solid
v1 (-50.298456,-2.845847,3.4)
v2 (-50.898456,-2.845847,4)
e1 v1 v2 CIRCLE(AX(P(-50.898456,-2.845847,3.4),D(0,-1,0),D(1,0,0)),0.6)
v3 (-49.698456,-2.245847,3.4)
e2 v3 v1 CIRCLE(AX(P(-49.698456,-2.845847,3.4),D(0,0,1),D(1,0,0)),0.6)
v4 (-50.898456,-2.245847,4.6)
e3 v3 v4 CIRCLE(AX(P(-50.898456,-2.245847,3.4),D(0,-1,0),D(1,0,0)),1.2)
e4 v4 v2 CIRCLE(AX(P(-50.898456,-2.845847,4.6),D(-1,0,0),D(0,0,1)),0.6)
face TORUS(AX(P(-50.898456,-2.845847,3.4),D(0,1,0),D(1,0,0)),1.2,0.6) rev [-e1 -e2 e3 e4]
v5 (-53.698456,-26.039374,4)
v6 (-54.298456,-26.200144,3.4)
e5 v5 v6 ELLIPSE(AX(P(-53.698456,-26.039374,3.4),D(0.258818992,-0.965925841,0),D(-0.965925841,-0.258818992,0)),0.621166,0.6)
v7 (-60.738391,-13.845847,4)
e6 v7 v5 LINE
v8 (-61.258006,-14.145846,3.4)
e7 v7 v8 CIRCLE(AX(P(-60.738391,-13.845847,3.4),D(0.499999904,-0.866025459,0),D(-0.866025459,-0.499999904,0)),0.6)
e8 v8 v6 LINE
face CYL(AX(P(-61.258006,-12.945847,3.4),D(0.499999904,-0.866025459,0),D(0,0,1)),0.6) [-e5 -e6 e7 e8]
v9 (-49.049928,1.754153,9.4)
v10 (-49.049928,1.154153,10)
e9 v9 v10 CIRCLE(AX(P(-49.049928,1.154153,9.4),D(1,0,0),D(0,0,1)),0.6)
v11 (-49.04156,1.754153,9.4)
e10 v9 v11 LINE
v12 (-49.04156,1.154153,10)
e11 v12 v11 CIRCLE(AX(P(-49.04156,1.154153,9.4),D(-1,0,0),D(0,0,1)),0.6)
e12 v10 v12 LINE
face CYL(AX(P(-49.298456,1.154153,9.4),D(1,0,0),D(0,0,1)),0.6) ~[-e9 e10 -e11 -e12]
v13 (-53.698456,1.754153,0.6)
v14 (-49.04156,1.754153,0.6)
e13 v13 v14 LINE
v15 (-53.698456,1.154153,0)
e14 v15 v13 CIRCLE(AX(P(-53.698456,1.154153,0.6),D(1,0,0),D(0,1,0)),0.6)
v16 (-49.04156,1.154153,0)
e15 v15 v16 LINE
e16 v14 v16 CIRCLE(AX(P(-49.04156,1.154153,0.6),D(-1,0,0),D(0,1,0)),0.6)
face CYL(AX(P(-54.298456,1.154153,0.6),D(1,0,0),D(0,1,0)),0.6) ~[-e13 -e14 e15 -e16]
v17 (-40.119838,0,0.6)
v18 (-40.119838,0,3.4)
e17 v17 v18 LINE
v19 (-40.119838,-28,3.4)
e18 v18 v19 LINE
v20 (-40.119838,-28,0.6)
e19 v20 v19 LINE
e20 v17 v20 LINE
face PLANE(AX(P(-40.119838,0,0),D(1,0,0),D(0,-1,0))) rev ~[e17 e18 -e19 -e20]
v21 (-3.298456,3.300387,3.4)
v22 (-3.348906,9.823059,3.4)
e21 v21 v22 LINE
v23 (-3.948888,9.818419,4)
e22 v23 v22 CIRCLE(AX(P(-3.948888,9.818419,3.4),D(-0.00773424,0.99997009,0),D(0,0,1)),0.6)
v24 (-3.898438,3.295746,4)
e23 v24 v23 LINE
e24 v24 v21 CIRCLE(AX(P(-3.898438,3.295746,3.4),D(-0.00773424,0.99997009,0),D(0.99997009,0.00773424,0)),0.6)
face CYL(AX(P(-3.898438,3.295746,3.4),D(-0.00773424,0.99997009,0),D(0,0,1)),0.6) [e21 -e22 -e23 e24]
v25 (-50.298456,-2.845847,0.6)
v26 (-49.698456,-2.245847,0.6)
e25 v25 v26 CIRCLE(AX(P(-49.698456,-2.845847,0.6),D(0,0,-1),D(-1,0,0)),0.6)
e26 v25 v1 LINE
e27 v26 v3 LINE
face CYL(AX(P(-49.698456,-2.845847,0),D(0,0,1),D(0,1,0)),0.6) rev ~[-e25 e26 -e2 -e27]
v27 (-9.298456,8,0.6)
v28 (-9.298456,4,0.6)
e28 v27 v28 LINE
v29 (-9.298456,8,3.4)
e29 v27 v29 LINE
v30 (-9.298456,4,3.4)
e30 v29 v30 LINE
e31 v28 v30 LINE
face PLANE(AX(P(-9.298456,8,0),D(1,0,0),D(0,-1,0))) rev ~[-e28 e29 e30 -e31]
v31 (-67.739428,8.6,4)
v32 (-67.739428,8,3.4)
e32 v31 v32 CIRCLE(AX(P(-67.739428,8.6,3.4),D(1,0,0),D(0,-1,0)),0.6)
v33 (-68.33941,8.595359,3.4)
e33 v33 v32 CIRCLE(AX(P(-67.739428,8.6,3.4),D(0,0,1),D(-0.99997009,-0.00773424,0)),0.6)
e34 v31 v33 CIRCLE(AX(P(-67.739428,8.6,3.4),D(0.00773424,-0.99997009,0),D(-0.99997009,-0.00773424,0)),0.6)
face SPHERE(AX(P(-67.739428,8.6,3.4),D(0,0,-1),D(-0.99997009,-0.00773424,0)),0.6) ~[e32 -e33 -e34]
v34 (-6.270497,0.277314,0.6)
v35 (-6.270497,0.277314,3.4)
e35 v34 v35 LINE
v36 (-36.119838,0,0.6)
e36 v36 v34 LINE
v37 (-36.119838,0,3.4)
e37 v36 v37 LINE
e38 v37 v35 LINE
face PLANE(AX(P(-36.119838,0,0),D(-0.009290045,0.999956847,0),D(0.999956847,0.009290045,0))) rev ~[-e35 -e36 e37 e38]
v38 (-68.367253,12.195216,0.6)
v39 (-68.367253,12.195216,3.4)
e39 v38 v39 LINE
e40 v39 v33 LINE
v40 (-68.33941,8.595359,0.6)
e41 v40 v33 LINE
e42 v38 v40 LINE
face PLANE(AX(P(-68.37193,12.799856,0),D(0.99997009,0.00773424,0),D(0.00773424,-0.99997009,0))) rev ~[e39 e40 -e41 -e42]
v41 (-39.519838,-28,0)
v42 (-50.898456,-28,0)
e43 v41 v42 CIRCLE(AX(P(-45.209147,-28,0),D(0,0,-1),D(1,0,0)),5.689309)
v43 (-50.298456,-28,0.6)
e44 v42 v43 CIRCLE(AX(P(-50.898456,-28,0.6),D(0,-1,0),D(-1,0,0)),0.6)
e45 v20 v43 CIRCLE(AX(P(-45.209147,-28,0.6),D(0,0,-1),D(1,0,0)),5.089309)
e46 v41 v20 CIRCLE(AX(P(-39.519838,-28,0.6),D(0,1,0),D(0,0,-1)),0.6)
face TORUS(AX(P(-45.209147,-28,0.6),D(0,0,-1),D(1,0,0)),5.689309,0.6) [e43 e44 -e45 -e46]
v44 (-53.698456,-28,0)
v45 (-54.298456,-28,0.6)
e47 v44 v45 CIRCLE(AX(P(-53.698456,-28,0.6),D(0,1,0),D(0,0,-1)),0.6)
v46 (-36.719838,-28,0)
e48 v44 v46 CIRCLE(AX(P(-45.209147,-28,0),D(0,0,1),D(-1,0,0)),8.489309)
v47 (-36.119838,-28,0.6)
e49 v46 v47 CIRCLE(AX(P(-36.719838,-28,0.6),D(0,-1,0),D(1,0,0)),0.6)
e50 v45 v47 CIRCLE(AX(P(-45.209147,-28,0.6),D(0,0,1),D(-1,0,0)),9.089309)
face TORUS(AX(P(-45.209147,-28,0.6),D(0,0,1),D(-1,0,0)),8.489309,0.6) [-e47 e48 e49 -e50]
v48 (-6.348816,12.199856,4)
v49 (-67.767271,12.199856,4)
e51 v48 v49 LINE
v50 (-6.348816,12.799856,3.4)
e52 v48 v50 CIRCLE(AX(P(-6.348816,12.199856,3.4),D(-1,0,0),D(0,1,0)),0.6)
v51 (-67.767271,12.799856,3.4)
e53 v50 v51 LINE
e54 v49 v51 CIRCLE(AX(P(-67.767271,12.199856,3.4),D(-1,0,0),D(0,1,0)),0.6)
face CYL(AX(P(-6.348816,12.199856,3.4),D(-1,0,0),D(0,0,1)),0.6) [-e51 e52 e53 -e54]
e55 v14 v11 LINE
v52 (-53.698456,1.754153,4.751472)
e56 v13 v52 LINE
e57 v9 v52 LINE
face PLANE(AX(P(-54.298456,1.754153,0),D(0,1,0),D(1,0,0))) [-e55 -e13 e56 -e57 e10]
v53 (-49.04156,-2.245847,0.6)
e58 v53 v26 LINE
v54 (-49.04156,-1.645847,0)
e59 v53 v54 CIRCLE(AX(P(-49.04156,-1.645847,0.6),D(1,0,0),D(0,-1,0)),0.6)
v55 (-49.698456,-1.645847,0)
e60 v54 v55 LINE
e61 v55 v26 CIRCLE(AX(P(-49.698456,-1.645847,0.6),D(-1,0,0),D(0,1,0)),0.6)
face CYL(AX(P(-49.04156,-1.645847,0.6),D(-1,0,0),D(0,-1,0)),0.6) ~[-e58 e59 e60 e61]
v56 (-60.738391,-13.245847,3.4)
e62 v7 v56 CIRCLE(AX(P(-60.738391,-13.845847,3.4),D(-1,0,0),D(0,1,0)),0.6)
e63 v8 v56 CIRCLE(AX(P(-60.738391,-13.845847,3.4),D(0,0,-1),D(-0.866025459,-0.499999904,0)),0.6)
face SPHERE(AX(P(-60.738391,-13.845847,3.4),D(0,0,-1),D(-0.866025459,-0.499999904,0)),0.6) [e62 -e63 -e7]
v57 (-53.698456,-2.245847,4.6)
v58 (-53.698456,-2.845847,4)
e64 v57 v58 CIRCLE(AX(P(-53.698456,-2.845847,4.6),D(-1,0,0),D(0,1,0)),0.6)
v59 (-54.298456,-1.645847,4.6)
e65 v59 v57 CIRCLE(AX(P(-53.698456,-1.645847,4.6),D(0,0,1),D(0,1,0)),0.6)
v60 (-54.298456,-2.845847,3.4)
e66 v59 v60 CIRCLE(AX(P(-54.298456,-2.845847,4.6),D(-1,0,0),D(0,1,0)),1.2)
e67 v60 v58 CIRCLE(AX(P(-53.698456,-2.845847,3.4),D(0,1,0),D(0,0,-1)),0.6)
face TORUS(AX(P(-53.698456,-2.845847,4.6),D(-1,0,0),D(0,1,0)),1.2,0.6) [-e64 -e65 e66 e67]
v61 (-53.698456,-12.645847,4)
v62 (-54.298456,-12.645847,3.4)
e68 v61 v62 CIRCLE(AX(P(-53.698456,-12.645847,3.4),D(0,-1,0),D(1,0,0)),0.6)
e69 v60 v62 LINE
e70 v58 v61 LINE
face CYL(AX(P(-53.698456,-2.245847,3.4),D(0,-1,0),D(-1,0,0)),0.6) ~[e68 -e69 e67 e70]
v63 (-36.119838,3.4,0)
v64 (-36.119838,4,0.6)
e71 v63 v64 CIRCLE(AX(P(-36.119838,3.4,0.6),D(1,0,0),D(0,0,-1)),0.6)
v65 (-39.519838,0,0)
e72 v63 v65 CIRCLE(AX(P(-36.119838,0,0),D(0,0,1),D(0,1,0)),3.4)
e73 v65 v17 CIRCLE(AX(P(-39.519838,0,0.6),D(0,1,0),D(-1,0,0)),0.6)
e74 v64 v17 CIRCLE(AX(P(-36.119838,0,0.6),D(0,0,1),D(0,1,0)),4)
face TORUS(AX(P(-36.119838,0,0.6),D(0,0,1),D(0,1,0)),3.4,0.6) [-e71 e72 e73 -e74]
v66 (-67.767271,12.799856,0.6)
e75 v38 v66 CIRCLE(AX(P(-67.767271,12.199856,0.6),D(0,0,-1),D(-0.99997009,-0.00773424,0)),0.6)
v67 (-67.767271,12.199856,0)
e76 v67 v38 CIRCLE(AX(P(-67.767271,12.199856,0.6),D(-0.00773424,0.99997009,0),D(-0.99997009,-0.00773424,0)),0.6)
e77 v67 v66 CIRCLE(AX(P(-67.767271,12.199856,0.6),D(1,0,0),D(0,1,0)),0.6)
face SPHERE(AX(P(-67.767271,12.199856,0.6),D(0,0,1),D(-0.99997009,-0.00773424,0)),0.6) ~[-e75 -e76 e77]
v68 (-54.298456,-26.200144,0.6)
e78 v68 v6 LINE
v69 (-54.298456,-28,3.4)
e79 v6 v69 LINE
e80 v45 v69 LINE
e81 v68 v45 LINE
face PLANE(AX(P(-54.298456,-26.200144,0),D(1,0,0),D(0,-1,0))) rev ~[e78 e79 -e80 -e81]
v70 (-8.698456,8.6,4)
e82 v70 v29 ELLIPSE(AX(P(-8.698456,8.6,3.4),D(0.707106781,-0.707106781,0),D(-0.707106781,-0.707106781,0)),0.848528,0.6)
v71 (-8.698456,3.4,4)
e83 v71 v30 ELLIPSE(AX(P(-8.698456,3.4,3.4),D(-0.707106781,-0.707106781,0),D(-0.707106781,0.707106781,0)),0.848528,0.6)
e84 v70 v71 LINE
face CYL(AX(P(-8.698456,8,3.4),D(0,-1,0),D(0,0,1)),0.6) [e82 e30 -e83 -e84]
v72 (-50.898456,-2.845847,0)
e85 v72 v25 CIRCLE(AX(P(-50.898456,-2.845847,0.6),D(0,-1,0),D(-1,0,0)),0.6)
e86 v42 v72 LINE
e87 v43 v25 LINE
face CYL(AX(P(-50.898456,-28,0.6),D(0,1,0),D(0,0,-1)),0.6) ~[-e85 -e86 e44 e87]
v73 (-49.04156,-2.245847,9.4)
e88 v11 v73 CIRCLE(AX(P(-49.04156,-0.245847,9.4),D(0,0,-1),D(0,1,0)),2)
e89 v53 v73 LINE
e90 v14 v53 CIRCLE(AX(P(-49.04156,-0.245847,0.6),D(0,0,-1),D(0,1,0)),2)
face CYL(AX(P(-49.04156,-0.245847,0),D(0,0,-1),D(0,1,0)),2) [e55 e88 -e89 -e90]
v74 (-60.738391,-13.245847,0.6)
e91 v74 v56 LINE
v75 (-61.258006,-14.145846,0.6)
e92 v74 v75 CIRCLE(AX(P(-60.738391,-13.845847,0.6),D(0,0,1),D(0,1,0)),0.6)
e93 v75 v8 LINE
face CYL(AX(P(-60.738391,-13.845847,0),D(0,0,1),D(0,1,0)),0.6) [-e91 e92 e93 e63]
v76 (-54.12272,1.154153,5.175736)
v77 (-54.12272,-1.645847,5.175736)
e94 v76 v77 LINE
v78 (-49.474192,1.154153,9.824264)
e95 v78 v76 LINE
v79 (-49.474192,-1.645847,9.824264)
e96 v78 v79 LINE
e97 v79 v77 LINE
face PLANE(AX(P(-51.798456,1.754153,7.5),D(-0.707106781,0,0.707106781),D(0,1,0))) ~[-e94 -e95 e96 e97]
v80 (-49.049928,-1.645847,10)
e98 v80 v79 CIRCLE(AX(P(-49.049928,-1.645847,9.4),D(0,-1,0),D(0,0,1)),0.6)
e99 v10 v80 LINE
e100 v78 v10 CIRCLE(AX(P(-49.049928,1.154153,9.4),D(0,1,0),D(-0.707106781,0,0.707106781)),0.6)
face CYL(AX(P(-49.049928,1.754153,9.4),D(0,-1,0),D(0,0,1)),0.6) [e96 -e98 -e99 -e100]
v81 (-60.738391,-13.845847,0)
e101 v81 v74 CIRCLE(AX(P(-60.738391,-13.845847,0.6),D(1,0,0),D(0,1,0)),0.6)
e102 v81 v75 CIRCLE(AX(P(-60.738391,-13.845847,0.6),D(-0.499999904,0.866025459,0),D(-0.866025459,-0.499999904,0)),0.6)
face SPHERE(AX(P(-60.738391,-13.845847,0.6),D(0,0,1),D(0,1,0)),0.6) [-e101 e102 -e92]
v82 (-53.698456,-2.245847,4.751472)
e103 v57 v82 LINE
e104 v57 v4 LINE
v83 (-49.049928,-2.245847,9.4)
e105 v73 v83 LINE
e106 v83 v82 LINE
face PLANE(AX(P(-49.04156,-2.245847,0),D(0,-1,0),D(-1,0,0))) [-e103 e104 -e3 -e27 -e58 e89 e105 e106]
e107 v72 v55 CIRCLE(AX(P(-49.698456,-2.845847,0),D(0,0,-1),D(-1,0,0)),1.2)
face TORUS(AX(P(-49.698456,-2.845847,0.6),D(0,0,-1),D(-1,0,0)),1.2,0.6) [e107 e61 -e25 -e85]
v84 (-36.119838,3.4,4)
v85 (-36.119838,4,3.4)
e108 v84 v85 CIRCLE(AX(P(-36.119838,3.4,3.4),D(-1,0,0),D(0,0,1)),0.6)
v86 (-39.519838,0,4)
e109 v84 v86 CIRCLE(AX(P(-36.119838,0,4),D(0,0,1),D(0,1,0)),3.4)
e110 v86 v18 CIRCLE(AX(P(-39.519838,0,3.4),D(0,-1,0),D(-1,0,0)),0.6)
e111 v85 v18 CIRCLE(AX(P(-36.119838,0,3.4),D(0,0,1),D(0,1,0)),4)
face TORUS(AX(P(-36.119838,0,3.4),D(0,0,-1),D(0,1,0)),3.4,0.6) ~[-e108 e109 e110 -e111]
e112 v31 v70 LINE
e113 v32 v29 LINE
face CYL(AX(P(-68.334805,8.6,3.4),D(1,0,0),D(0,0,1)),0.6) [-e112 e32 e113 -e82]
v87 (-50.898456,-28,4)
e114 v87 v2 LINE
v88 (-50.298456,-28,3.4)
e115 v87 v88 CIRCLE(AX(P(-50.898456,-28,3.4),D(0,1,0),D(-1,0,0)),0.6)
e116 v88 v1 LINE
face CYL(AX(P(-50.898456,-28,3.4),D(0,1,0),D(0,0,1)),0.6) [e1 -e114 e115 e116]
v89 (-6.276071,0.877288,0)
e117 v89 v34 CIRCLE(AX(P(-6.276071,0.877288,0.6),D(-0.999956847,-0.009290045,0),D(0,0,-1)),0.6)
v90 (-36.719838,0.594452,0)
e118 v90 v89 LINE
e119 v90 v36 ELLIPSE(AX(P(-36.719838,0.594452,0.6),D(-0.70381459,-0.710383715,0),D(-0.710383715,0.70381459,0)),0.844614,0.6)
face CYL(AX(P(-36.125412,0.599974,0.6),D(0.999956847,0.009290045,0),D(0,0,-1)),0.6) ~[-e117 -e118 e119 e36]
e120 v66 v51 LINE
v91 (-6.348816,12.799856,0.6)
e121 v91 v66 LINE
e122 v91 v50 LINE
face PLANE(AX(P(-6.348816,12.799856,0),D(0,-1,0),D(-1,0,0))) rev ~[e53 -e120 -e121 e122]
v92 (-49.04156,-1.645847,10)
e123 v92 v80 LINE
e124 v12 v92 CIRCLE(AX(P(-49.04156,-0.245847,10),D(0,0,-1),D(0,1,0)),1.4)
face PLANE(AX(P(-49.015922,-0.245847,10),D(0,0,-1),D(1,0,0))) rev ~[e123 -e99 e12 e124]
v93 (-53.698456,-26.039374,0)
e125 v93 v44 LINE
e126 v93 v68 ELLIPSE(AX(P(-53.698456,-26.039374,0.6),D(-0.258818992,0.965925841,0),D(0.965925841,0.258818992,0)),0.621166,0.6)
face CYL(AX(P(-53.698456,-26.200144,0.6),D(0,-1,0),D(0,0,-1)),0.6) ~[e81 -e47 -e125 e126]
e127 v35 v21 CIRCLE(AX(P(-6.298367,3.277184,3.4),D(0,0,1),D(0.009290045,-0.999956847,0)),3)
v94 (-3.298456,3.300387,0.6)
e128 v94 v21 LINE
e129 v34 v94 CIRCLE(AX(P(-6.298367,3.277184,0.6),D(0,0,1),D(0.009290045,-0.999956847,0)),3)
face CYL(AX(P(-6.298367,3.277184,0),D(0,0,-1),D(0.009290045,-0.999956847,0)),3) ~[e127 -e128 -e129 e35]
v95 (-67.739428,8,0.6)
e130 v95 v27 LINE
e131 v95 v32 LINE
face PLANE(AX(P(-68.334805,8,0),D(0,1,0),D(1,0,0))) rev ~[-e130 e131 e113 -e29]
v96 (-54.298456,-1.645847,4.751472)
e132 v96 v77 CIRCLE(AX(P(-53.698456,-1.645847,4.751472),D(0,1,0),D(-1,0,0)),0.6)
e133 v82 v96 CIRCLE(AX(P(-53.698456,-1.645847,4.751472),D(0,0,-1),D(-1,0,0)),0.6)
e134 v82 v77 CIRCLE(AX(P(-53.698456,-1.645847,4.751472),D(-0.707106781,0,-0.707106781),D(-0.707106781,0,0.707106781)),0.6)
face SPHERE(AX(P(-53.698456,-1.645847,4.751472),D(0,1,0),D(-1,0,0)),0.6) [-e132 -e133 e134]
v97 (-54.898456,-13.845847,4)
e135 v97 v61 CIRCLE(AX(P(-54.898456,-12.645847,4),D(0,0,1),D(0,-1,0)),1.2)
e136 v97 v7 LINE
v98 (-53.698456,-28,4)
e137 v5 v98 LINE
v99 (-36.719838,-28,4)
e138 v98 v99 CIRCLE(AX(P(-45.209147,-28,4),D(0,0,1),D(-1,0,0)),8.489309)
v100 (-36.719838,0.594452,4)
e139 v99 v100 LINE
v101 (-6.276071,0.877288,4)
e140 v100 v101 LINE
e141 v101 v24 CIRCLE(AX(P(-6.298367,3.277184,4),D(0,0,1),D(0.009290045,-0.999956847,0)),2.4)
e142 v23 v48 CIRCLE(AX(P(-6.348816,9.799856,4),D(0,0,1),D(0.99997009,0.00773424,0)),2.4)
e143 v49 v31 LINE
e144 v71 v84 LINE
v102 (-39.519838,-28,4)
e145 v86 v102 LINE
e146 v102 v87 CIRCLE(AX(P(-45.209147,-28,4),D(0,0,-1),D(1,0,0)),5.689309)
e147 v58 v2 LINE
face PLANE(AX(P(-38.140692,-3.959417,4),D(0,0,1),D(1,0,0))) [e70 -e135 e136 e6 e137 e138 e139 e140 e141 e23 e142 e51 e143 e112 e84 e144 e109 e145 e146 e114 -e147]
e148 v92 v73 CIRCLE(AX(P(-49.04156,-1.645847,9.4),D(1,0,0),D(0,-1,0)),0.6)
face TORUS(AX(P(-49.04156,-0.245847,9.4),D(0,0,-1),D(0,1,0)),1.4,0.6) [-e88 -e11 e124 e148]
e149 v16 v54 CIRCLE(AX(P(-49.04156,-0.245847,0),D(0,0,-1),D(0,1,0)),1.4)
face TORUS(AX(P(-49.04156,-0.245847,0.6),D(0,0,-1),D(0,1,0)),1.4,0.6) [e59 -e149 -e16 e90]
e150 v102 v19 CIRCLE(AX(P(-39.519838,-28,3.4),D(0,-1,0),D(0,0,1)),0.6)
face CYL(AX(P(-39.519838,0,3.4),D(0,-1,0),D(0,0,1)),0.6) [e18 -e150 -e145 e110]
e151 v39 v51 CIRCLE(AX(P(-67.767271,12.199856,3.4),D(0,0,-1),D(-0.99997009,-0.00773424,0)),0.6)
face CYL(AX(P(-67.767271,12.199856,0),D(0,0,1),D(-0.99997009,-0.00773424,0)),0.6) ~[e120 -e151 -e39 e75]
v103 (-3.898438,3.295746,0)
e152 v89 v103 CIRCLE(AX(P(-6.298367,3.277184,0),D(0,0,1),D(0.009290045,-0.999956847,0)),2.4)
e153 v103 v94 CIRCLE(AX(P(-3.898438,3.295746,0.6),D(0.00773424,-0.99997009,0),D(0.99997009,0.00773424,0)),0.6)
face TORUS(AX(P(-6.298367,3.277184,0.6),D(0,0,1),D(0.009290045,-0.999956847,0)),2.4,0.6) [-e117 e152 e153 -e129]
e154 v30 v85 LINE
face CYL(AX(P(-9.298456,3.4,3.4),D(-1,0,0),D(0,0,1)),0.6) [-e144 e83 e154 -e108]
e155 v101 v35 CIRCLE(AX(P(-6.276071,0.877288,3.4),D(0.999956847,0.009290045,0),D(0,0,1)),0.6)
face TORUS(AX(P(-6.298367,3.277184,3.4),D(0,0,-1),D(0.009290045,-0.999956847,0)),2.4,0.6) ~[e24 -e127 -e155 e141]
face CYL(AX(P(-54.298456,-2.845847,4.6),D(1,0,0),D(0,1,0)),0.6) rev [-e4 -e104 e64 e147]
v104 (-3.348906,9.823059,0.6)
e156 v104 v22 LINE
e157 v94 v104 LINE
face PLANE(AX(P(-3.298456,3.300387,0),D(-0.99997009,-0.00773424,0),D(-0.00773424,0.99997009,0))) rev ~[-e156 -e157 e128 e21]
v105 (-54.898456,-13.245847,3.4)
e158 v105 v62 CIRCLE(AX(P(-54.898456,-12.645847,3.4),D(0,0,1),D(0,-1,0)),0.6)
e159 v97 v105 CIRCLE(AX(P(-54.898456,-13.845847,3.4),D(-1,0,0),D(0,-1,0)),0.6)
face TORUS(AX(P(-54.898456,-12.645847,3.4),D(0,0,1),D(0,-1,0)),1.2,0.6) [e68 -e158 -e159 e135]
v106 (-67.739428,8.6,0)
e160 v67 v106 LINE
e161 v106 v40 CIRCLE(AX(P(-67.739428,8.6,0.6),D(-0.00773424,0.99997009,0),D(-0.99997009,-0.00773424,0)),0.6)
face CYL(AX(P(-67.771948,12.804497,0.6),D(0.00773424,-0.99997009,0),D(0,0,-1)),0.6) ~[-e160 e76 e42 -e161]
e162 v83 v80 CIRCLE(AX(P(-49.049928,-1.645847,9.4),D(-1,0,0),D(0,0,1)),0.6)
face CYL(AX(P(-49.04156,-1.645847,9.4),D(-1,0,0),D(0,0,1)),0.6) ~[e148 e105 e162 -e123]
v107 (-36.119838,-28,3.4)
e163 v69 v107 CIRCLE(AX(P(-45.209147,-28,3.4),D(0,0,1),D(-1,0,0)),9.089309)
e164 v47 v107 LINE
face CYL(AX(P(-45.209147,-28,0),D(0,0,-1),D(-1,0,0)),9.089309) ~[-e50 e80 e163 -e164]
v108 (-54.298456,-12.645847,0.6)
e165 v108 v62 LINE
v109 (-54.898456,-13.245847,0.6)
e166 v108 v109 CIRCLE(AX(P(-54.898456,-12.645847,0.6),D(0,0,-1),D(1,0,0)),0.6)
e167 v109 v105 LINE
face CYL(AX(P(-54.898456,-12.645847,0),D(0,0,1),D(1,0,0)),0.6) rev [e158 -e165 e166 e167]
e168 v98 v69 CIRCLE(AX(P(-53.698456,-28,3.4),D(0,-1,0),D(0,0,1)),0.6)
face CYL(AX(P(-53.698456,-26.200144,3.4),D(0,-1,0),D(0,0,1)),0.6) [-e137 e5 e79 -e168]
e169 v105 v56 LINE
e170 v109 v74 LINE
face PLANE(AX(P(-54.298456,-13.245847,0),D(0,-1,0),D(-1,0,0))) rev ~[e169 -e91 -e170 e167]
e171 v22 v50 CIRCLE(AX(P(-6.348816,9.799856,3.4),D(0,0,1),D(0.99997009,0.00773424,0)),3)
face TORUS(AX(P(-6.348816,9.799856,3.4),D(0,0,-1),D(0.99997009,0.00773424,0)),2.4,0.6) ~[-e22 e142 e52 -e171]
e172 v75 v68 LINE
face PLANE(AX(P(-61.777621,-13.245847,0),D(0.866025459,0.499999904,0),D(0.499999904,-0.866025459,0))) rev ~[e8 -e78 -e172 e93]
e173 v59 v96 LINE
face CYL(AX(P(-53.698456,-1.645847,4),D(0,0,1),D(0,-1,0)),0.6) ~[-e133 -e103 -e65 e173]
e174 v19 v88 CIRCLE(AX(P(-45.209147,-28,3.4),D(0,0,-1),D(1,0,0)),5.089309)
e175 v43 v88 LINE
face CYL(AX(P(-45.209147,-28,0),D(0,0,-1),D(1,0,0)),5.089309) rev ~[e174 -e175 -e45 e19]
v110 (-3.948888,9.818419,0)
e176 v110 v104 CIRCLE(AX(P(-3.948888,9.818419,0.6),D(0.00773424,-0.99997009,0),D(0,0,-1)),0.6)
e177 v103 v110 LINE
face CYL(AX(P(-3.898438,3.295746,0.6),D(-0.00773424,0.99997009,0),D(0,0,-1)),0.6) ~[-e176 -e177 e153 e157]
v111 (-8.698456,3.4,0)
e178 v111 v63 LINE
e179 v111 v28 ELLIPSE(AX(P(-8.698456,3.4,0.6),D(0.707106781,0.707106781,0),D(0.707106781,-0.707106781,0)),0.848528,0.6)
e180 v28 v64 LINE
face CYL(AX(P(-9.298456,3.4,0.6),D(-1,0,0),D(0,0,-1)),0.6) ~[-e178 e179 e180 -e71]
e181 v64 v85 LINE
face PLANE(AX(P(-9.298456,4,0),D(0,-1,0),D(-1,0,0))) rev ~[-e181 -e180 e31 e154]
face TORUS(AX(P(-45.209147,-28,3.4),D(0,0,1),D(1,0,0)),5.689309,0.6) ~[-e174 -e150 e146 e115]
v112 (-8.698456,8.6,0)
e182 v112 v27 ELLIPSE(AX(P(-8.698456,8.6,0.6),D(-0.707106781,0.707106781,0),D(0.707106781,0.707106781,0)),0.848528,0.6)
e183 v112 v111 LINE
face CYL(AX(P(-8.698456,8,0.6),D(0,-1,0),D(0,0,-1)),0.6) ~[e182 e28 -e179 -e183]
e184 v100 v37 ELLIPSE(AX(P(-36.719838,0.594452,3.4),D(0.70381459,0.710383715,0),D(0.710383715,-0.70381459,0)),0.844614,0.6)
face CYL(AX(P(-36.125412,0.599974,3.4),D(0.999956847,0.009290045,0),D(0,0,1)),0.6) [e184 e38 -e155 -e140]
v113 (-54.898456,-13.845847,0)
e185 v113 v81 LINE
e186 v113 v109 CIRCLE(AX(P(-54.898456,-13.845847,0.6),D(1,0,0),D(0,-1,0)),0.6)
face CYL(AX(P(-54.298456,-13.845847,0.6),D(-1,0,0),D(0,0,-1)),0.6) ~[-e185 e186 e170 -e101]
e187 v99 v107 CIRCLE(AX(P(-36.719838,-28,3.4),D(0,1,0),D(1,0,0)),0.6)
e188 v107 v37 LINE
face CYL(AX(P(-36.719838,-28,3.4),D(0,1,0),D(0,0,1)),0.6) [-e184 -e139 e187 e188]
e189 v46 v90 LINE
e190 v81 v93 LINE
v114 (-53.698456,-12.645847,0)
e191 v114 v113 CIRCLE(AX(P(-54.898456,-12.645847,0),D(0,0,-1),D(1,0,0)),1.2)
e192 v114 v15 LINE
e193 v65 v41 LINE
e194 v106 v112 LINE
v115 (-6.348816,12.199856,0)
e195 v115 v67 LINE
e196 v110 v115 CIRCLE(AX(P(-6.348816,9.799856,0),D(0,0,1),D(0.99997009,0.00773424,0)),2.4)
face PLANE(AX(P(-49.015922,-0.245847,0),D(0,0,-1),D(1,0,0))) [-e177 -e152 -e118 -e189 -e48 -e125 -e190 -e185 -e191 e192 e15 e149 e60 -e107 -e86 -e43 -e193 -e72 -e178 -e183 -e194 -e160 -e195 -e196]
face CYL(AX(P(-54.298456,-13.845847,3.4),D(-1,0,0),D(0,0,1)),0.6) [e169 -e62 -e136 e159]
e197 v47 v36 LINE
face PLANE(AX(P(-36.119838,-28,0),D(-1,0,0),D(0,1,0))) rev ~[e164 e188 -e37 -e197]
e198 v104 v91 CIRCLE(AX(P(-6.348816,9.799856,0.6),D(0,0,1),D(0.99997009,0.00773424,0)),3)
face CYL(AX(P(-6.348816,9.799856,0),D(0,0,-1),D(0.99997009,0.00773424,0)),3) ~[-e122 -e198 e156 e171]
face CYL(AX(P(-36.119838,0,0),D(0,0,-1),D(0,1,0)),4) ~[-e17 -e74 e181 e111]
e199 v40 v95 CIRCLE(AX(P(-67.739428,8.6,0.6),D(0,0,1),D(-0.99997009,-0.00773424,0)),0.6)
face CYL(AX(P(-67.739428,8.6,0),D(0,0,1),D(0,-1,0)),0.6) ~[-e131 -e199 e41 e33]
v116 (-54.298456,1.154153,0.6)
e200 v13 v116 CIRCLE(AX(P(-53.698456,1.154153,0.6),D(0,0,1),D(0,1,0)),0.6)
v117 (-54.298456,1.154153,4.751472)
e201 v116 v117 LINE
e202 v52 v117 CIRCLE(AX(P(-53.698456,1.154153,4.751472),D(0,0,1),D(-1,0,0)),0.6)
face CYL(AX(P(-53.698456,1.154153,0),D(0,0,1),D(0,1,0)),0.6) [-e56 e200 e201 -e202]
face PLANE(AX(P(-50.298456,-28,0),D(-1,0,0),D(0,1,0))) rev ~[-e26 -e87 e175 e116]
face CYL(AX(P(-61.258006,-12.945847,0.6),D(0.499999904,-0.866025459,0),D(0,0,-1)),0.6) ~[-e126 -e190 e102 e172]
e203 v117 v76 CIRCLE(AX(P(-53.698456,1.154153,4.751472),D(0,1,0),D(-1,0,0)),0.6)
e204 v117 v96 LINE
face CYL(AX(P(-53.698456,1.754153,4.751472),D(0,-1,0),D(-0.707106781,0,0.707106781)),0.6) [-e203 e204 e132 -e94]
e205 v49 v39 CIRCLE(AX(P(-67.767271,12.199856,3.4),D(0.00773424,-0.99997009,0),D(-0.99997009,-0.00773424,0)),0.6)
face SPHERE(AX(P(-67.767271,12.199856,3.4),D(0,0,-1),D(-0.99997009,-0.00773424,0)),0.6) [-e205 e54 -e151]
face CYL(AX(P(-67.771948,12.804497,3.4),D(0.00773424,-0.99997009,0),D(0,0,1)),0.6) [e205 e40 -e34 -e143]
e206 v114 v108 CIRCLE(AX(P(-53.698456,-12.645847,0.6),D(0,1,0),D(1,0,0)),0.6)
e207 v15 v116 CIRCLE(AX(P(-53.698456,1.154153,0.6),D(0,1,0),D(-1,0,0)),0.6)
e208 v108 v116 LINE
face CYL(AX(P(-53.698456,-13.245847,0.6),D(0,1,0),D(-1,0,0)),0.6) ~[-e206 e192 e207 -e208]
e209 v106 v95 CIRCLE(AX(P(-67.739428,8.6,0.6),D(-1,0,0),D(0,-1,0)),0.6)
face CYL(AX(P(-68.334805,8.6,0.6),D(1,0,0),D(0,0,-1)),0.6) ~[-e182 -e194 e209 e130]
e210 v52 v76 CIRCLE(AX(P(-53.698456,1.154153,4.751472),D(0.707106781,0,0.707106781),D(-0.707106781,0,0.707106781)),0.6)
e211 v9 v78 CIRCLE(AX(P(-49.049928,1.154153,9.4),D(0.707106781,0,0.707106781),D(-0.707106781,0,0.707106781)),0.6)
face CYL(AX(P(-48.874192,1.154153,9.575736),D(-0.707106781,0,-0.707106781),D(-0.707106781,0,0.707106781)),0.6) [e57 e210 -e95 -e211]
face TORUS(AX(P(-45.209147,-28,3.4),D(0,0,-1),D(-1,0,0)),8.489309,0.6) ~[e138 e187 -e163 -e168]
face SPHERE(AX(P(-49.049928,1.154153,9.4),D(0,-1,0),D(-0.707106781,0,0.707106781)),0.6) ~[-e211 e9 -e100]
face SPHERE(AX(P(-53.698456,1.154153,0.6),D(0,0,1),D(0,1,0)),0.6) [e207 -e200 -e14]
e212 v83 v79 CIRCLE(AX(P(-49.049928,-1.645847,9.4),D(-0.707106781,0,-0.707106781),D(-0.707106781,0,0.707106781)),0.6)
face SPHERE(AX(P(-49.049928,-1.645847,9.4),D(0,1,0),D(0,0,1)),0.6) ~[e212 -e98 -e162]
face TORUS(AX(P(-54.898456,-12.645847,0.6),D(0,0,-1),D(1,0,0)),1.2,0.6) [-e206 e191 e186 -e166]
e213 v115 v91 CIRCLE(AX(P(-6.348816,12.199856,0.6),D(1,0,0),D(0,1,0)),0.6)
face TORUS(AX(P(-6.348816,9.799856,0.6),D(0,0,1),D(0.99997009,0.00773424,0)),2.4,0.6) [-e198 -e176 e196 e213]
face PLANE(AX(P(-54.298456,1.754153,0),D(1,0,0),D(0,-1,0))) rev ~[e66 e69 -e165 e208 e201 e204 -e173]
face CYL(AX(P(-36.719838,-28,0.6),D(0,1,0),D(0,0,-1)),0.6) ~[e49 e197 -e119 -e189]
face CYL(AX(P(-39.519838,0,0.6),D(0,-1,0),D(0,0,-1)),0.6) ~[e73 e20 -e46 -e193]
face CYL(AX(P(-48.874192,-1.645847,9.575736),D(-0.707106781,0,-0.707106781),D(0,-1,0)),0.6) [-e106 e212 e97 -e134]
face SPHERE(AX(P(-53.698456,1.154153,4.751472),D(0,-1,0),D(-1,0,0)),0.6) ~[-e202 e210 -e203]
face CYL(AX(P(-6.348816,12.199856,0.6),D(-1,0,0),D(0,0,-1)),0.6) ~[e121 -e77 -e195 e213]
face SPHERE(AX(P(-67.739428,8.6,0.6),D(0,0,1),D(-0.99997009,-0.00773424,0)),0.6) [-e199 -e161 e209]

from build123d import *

# Parameters (mm, degrees)
F1_DEPTH = 4
F2_W     = 4
F2_H     = 4
F3_DEPTH = 10
F4_SIZE  = 5
F5_R     = 0.6


with BuildPart() as f1:
    # F0 (on Top) → F1 (new body)
    with BuildSketch(Plane.XY):
        with BuildLine():
            Line((-6.348816124, 12.7998564335), (-68.3719298071, 12.7998564335))
            Line((-68.3719298071, 12.7998564335), (-68.3348054537, 8))
            Line((-68.3348054537, 8), (-9.2984564299, 8))
            Line((-9.2984564299, 8), (-9.2984564299, 4))
            Line((-9.2984564299, 4), (-36.1198379695, 4))
            ThreePointArc((-36.1198379695, 4), (-38.9482650943, 2.8284271247), (-40.1198379695, 0))
            Line((-40.1198379695, 0), (-40.1198379695, -28))
            ThreePointArc((-40.1198379695, -28), (-45.2091471997, -33.0893092302), (-50.2984564299, -28))
            Line((-50.2984564299, -28), (-50.2984564299, 1.7541534589))
            Line((-50.2984564299, 1.7541534589), (-54.2984564299, 1.7541534589))
            Line((-54.2984564299, 1.7541534589), (-54.2984564299, -13.2458465411))
            Line((-54.2984564299, -13.2458465411), (-61.7776213991, -13.2458465411))
            Line((-61.7776213991, -13.2458465411), (-54.2984564299, -26.2001435665))
            Line((-54.2984564299, -26.2001435665), (-54.2984564299, -28))
            ThreePointArc((-54.2984564299, -28), (-45.2091471997, -37.0893092302), (-36.1198379695, -28))
            Line((-36.1198379695, -28), (-36.1198379695, 0))
            Line((-36.1198379695, 0), (-6.2704965664, 0.2773136864))
            ThreePointArc((-6.2704965664, 0.2773136864), (-4.1590662239, 1.1739977225), (-3.2984564299, 3.3003869471))
            Line((-3.2984564299, 3.3003869471), (-3.348905853, 9.8230591544))
            ThreePointArc((-3.348905853, 9.8230591544), (-4.2357151045, 11.929364377), (-6.348816124, 12.7998564335))
        make_face()
    extrude(amount=F1_DEPTH)

    # F2 (on face) → F3 (join)
    with BuildSketch(Plane(origin=(0, 0, 0), x_dir=(1, 0, 0), z_dir=(0, 0, -1))):
        with BuildLine():
            Line((-50.2984564299, -1.7541534589), (-49.0415598922, -1.7541534589))
            ThreePointArc((-49.0415598922, -1.7541534589), (-47.0415598922, 0.2458465411), (-49.0415598922, 2.2458465411))
            Line((-49.0415598922, 2.2458465411), (-50.2984564299, 2.2458465411))
            Line((-50.2984564299, 2.2458465411), (-50.2984564299, -1.7541534589))
        make_face()
        with Locations((-52.2984564299, 0.2458465411)):
            Rectangle(F2_W, F2_H)
    extrude(amount=-F3_DEPTH)

    # F4
    f4_edges = [f1.edges().sort_by_distance(p)[0] for p in [
        (-54.298456, -0.245847, 10),
    ]]
    chamfer(f4_edges, length=F4_SIZE)

    # F5
    f5_edges = [f1.edges().sort_by_distance(p)[0] for p in [
        (-68.353368, 10.399928, 4),
        (-37.360373, 12.799856, 4),
        (-4.235715, 11.929364, 4),
        (-3.323681, 6.561723, 4),
        (-4.159066, 1.173998, 4),
        (-21.195167, 0.138657, 4),
        (-36.119838, -14, 4),
        (-45.209147, -37.089309, 4),
        (-54.298456, -27.100072, 4),
        (-58.038039, -19.722995, 4),
        (-58.038039, -13.245847, 4),
        (-54.298456, -7.745847, 4),
        (-52.298456, -2.245847, 4),
        (-50.298456, -15.122923, 4),
        (-45.209147, -33.089309, 4),
        (-40.119838, -14, 4),
        (-38.948265, 2.828427, 4),
        (-22.709147, 4, 4),
        (-9.298456, 6, 4),
        (-38.816631, 8, 4),
        (-61.777621, -13.245847, 2),
        (-68.334805, 8, 2),
        (-68.37193, 12.799856, 2),
        (-54.298456, 1.754153, 2.5),
        (-51.798456, 1.754153, 7.5),
        (-47.04156, -0.245847, 10),
        (-51.798456, -2.245847, 7.5),
        (-68.353368, 10.399928, 0),
        (-38.816631, 8, 0),
        (-9.298456, 6, 0),
        (-22.709147, 4, 0),
        (-38.948265, 2.828427, 0),
        (-40.119838, -14, 0),
        (-45.209147, -33.089309, 0),
        (-50.298456, -15.122923, 0),
        (-49.670008, -2.245847, 0),
        (-47.04156, -0.245847, 0),
        (-51.670008, 1.754153, 0),
        (-54.298456, -5.745847, 0),
        (-58.038039, -13.245847, 0),
        (-58.038039, -19.722995, 0),
        (-54.298456, -27.100072, 0),
        (-45.209147, -37.089309, 0),
        (-36.119838, -14, 0),
        (-21.195167, 0.138657, 0),
        (-4.159066, 1.173998, 0),
        (-3.323681, 6.561723, 0),
        (-4.235715, 11.929364, 0),
        (-37.360373, 12.799856, 0),
        (-49.298456, -0.245847, 10),
        (-54.298456, -0.245847, 5),
        (-54.298456, -2.245847, 4.5),
        (-54.298456, -13.245847, 2),
        (-50.298456, -2.245847, 2),
    ]]
    fillet(f5_edges, radius=F5_R)


solid = f1.part
